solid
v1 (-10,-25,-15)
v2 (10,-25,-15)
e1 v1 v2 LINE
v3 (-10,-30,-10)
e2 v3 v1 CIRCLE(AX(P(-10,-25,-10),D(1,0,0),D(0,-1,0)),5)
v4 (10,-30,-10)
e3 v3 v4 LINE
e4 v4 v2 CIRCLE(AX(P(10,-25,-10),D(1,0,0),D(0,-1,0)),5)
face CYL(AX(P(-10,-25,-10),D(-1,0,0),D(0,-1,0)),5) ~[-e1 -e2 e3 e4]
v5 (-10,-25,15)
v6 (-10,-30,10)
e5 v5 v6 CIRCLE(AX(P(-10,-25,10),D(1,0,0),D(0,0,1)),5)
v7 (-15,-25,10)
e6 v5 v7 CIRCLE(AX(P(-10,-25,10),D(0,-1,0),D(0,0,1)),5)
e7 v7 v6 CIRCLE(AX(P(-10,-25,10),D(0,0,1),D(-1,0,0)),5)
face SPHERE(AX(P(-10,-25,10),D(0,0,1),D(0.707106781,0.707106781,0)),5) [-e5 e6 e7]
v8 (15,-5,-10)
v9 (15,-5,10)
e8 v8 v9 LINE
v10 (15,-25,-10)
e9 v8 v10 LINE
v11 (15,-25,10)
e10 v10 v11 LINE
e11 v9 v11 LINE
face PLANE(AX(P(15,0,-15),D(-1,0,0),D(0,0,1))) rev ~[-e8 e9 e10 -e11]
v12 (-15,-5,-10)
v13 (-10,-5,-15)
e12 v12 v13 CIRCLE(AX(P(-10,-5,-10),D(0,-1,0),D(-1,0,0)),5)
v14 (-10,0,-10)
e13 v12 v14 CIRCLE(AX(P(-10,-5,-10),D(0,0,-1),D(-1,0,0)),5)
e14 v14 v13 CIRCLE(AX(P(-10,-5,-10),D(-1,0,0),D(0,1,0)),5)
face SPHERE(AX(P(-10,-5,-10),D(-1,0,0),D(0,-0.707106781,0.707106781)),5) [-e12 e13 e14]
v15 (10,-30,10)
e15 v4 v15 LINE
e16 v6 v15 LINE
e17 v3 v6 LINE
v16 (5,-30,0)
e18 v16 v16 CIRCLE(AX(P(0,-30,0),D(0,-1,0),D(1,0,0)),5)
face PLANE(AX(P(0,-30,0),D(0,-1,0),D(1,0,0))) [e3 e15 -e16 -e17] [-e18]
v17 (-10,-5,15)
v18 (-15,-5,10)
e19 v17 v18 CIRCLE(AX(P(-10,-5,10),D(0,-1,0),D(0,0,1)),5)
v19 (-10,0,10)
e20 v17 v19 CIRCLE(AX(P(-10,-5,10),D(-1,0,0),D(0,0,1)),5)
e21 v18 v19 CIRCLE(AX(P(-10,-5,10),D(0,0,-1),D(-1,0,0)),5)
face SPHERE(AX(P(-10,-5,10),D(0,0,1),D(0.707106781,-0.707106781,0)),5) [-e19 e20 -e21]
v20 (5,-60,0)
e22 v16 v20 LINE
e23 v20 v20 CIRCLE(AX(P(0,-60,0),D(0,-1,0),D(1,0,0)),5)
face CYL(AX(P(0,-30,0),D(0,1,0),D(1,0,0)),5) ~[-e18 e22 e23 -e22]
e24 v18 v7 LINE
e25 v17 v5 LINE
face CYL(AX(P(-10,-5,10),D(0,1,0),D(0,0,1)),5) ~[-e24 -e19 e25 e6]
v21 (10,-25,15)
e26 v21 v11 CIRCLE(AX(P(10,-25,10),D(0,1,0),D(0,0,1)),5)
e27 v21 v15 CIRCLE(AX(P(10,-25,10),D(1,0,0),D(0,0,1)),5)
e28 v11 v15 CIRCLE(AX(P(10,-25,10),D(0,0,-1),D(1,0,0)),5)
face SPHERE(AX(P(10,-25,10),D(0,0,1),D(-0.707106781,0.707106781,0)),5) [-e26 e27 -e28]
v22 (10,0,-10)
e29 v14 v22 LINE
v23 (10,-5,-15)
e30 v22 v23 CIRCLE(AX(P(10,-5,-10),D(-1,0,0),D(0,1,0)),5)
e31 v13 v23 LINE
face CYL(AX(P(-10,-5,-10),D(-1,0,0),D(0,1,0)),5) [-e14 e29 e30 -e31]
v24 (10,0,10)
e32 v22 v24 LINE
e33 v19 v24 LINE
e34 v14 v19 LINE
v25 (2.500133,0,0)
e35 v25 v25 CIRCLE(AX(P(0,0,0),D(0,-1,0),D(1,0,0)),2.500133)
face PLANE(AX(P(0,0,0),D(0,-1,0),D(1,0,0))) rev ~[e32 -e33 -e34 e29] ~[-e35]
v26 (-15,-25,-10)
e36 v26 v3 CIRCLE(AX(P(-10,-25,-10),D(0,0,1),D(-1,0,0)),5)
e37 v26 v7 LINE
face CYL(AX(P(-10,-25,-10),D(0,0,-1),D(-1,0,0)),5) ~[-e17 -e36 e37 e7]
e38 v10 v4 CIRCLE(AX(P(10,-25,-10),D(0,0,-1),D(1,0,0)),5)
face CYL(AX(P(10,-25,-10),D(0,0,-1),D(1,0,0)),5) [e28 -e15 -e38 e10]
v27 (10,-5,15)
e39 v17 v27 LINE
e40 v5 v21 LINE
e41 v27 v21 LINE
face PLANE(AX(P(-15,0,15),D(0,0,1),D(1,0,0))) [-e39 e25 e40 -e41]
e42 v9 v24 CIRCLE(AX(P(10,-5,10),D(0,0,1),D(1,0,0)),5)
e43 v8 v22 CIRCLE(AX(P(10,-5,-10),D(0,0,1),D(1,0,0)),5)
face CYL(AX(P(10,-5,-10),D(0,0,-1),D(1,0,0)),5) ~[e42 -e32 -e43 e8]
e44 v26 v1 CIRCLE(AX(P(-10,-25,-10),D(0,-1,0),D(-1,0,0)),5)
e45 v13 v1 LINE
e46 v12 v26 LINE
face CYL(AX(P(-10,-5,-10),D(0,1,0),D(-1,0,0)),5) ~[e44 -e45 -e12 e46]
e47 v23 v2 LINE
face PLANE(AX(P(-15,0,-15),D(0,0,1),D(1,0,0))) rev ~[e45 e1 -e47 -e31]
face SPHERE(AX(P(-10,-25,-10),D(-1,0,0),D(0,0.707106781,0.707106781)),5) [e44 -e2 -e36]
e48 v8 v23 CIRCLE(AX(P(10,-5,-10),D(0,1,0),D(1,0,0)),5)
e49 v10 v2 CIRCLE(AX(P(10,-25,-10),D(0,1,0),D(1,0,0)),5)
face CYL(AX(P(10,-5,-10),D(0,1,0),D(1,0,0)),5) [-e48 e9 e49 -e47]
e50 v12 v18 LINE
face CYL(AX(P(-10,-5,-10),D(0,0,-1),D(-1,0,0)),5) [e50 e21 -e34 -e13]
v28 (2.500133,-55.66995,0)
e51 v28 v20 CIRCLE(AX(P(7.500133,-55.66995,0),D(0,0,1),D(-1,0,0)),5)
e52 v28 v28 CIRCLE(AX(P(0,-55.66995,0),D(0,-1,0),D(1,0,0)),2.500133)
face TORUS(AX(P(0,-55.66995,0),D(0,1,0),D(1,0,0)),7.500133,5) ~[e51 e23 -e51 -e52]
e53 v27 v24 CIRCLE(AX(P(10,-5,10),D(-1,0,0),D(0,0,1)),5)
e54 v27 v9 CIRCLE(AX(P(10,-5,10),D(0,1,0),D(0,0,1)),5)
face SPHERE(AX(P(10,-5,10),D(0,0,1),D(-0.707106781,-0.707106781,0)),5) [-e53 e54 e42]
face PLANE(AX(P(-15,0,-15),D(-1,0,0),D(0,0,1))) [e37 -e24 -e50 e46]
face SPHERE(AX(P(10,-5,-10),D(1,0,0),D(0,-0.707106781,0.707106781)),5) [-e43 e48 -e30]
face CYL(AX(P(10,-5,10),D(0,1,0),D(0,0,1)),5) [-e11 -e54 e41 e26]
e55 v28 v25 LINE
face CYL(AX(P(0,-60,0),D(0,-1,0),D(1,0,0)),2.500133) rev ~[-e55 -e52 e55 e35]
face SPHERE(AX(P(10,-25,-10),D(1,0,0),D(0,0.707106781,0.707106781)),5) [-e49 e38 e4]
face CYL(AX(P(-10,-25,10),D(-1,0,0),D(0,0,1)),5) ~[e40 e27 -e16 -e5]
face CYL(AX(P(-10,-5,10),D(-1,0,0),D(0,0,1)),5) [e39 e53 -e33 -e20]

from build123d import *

# Parameters (mm, degrees)
F0_W         = 30
F0_H         = 30
F1_DEPTH     = 30
F2_R         = 5
F3_DEPTH     = 30
F4_R         = 2.5001325449
F5_DEPTH     = 60.001
F6_T1_DEPTH  = 20
F6_T3_DEPTH  = 20
F6_T5_DEPTH  = 20
F6_S9_W      = 5.1
F6_S9_H      = 5.1
F6_T10_DEPTH = 5.1
F6_S15_W     = 5.1
F6_S15_H     = 5.1
F6_T16_DEPTH = 5.1
F6_S21_W     = 5.1
F6_S21_H     = 5.1
F6_T22_DEPTH = 5.1
F6_S27_W     = 5.1
F6_S27_H     = 5.1
F6_T28_DEPTH = 5.1
F6_S33_W     = 5.1
F6_S33_H     = 5.1
F6_T34_DEPTH = 5.1
F6_S39_W     = 5.1
F6_S39_H     = 5.1
F6_T40_DEPTH = 5.1
F6_S45_W     = 5.1
F6_S45_H     = 5.1
F6_T46_DEPTH = 5.1
F6_S51_W     = 5.1
F6_S51_H     = 5.1
F6_T52_DEPTH = 5.1


# Not quite as in the source:
# - a fillet or chamfer that OpenCascade refuses, or shapes differently, is made with other operations: its cross-section is extruded or revolved along the edge and cut away or added


with BuildPart() as f1:
    # F0 (on Front) → F1 (new body)
    with BuildSketch(Plane.XZ):
        Rectangle(F0_W, F0_H)
    extrude(amount=F1_DEPTH)

    # F2 (on face) → F3 (join)
    with BuildSketch(Plane.XZ.offset(30)):
        Circle(F2_R)
    extrude(amount=F3_DEPTH)

    # F4 (on face) → F5 (cut, through all)
    with BuildSketch(Plane.XZ.offset(60)):
        Circle(F4_R)
    extrude(amount=-F5_DEPTH, mode=Mode.SUBTRACT)

    # F6: fillet of radius 5 on 13 edges, made by hand

    # F6_s2 → F6_t1 (cut)
    with BuildSketch(Plane.XZ.offset(5)):
        with BuildLine():
            ThreePointArc((10, 15), (13.5355339059, 13.5355339059), (15, 10))
            Line((15, 10), (15, 15))
            Line((15, 15), (10, 15))
        make_face()
        with BuildLine():
            ThreePointArc((-10, 15), (-13.5355339059, 13.5355339059), (-15, 10))
            Line((-15, 10), (-15, 15))
            Line((-15, 15), (-10, 15))
        make_face()
        with BuildLine():
            ThreePointArc((-15, -10), (-13.5355339059, -13.5355339059), (-10, -15))
            Line((-10, -15), (-15, -15))
            Line((-15, -15), (-15, -10))
        make_face()
        with BuildLine():
            ThreePointArc((15, -10), (13.5355339059, -13.5355339059), (10, -15))
            Line((10, -15), (15, -15))
            Line((15, -15), (15, -10))
        make_face()
    extrude(amount=F6_T1_DEPTH, mode=Mode.SUBTRACT)

    # F6_s4 → F6_t3 (cut)
    with BuildSketch(Plane.YZ.offset(-10)):
        with BuildLine():
            ThreePointArc((-25, 15), (-28.5355339059, 13.5355339059), (-30, 10))
            Line((-30, 10), (-30, 15))
            Line((-30, 15), (-25, 15))
        make_face()
        with BuildLine():
            ThreePointArc((-5, 15), (-1.4644660941, 13.5355339059), (0, 10))
            Line((0, 10), (0, 15))
            Line((0, 15), (-5, 15))
        make_face()
        with BuildLine():
            ThreePointArc((-30, -10), (-28.5355339059, -13.5355339059), (-25, -15))
            Line((-25, -15), (-30, -15))
            Line((-30, -15), (-30, -10))
        make_face()
        with BuildLine():
            ThreePointArc((0, -10), (-1.4644660941, -13.5355339059), (-5, -15))
            Line((-5, -15), (0, -15))
            Line((0, -15), (0, -10))
        make_face()
    extrude(amount=F6_T3_DEPTH, mode=Mode.SUBTRACT)

    # F6_s6 → F6_t5 (cut)
    with BuildSketch(Plane.XY.offset(-10)):
        with BuildLine():
            ThreePointArc((-15, -5), (-13.5355339059, -1.4644660941), (-10, 0))
            Line((-10, 0), (-15, 0))
            Line((-15, 0), (-15, -5))
        make_face()
        with BuildLine():
            ThreePointArc((-15, -25), (-13.5355339059, -28.5355339059), (-10, -30))
            Line((-10, -30), (-15, -30))
            Line((-15, -30), (-15, -25))
        make_face()
        with BuildLine():
            ThreePointArc((15, -5), (13.5355339059, -1.4644660941), (10, 0))
            Line((10, 0), (15, 0))
            Line((15, 0), (15, -5))
        make_face()
        with BuildLine():
            ThreePointArc((15, -25), (13.5355339059, -28.5355339059), (10, -30))
            Line((10, -30), (15, -30))
            Line((15, -30), (15, -25))
        make_face()
    extrude(amount=F6_T5_DEPTH, mode=Mode.SUBTRACT)


with BuildPart() as f6_tool8:
    # F6_s9 → F6_t10 (new body)
    with BuildSketch(Plane.XY.offset(10)):
        with Locations((12.55, -2.45)):
            Rectangle(F6_S9_W, F6_S9_H)
    extrude(amount=F6_T10_DEPTH)

    # F6_s11 → F6_t12 (revolve, cut)
    with BuildSketch(Plane(origin=(10, -5, 10), x_dir=(-0.7071067812, -0.7071067812, 0), z_dir=(-0.7071067812, 0.7071067812, 0))):
        with BuildLine():
            ThreePointArc((0, -5), (5, 0), (0, 5))
            Line((0, 5), (0, -5))
        make_face()
    revolve(axis=Axis((10, -5, 10), (0, 0, 1)), mode=Mode.SUBTRACT)


with BuildPart() as f1_1:
    add(f1.part)

    # F6_t7: cut F6_tool8
    add(f6_tool8.part, mode=Mode.SUBTRACT)


with BuildPart() as f6_tool14:
    # F6_s15 → F6_t16 (new body)
    with BuildSketch(Plane.XY.offset(10)):
        with Locations((12.55, -27.55)):
            Rectangle(F6_S15_W, F6_S15_H)
    extrude(amount=F6_T16_DEPTH)

    # F6_s17 → F6_t18 (revolve, cut)
    with BuildSketch(Plane(origin=(10, -25, 10), x_dir=(-0.7071067812, 0.7071067812, 0), z_dir=(0.7071067812, 0.7071067812, 0))):
        with BuildLine():
            ThreePointArc((0, -5), (5, 0), (0, 5))
            Line((0, 5), (0, -5))
        make_face()
    revolve(axis=Axis((10, -25, 10), (0, 0, 1)), mode=Mode.SUBTRACT)


with BuildPart() as f1_2:
    add(f1_1.part)

    # F6_t13: cut F6_tool14
    add(f6_tool14.part, mode=Mode.SUBTRACT)


with BuildPart() as f6_tool20:
    # F6_s21 → F6_t22 (new body)
    with BuildSketch(Plane.XY.offset(10)):
        with Locations((-12.55, -2.45)):
            Rectangle(F6_S21_W, F6_S21_H)
    extrude(amount=F6_T22_DEPTH)

    # F6_s23 → F6_t24 (revolve, cut)
    with BuildSketch(Plane(origin=(-10, -5, 10), x_dir=(0.7071067812, -0.7071067812, 0), z_dir=(-0.7071067812, -0.7071067812, 0))):
        with BuildLine():
            ThreePointArc((0, -5), (5, 0), (0, 5))
            Line((0, 5), (0, -5))
        make_face()
    revolve(axis=Axis((-10, -5, 10), (0, 0, 1)), mode=Mode.SUBTRACT)


with BuildPart() as f1_3:
    add(f1_2.part)

    # F6_t19: cut F6_tool20
    add(f6_tool20.part, mode=Mode.SUBTRACT)


with BuildPart() as f6_tool26:
    # F6_s27 → F6_t28 (new body)
    with BuildSketch(Plane.XY.offset(10)):
        with Locations((-12.55, -27.55)):
            Rectangle(F6_S27_W, F6_S27_H)
    extrude(amount=F6_T28_DEPTH)

    # F6_s29 → F6_t30 (revolve, cut)
    with BuildSketch(Plane(origin=(-10, -25, 10), x_dir=(0.7071067812, 0.7071067812, 0), z_dir=(0.7071067812, -0.7071067812, 0))):
        with BuildLine():
            ThreePointArc((0, -5), (5, 0), (0, 5))
            Line((0, 5), (0, -5))
        make_face()
    revolve(axis=Axis((-10, -25, 10), (0, 0, 1)), mode=Mode.SUBTRACT)


with BuildPart() as f1_4:
    add(f1_3.part)

    # F6_t25: cut F6_tool26
    add(f6_tool26.part, mode=Mode.SUBTRACT)


with BuildPart() as f6_tool32:
    # F6_s33 → F6_t34 (new body)
    with BuildSketch(Plane.YZ.offset(-10)):
        with Locations((-27.55, -12.55)):
            Rectangle(F6_S33_W, F6_S33_H)
    extrude(amount=-F6_T34_DEPTH)

    # F6_s35 → F6_t36 (revolve, cut)
    with BuildSketch(Plane(origin=(-10, -25, -10), x_dir=(0, 0.7071067812, 0.7071067812), z_dir=(0, -0.7071067812, 0.7071067812))):
        with BuildLine():
            ThreePointArc((0, -5), (5, 0), (0, 5))
            Line((0, 5), (0, -5))
        make_face()
    revolve(axis=Axis((-10, -25, -10), (-1, 0, 0)), mode=Mode.SUBTRACT)


with BuildPart() as f1_5:
    add(f1_4.part)

    # F6_t31: cut F6_tool32
    add(f6_tool32.part, mode=Mode.SUBTRACT)


with BuildPart() as f6_tool38:
    # F6_s39 → F6_t40 (new body)
    with BuildSketch(Plane.YZ.offset(10)):
        with Locations((-27.55, -12.55)):
            Rectangle(F6_S39_W, F6_S39_H)
    extrude(amount=F6_T40_DEPTH)

    # F6_s41 → F6_t42 (revolve, cut)
    with BuildSketch(Plane(origin=(10, -25, -10), x_dir=(0, 0.7071067812, 0.7071067812), z_dir=(0, 0.7071067812, -0.7071067812))):
        with BuildLine():
            ThreePointArc((0, -5), (5, 0), (0, 5))
            Line((0, 5), (0, -5))
        make_face()
    revolve(axis=Axis((10, -25, -10), (1, 0, 0)), mode=Mode.SUBTRACT)


with BuildPart() as f1_6:
    add(f1_5.part)

    # F6_t37: cut F6_tool38
    add(f6_tool38.part, mode=Mode.SUBTRACT)


with BuildPart() as f6_tool44:
    # F6_s45 → F6_t46 (new body)
    with BuildSketch(Plane.YZ.offset(-10)):
        with Locations((-2.45, -12.55)):
            Rectangle(F6_S45_W, F6_S45_H)
    extrude(amount=-F6_T46_DEPTH)

    # F6_s47 → F6_t48 (revolve, cut)
    with BuildSketch(Plane(origin=(-10, -5, -10), x_dir=(0, -0.7071067812, 0.7071067812), z_dir=(0, -0.7071067812, -0.7071067812))):
        with BuildLine():
            ThreePointArc((0, -5), (5, 0), (0, 5))
            Line((0, 5), (0, -5))
        make_face()
    revolve(axis=Axis((-10, -5, -10), (-1, 0, 0)), mode=Mode.SUBTRACT)


with BuildPart() as f1_7:
    add(f1_6.part)

    # F6_t43: cut F6_tool44
    add(f6_tool44.part, mode=Mode.SUBTRACT)


with BuildPart() as f6_tool50:
    # F6_s51 → F6_t52 (new body)
    with BuildSketch(Plane.YZ.offset(10)):
        with Locations((-2.45, -12.55)):
            Rectangle(F6_S51_W, F6_S51_H)
    extrude(amount=F6_T52_DEPTH)

    # F6_s53 → F6_t54 (revolve, cut)
    with BuildSketch(Plane(origin=(10, -5, -10), x_dir=(0, -0.7071067812, 0.7071067812), z_dir=(0, 0.7071067812, 0.7071067812))):
        with BuildLine():
            ThreePointArc((0, -5), (5, 0), (0, 5))
            Line((0, 5), (0, -5))
        make_face()
    revolve(axis=Axis((10, -5, -10), (1, 0, 0)), mode=Mode.SUBTRACT)


with BuildPart() as f1_8:
    add(f1_7.part)

    # F6_t49: cut F6_tool50
    add(f6_tool50.part, mode=Mode.SUBTRACT)

    # F6_s55 → F6_t56 (revolve, cut)
    with BuildSketch(Plane.XY):
        with BuildLine():
            ThreePointArc((2.5001325449, -55.6699495086), (3.1699672637, -58.1698832353), (5, -60))
            Line((5, -60), (2.5001325449, -60))
            Line((2.5001325449, -60), (2.5001325449, -55.6699495086))
        make_face()
    revolve(axis=Axis((0, -60, 0), (0, -1, 0)), mode=Mode.SUBTRACT)


solid = f1_8.part
